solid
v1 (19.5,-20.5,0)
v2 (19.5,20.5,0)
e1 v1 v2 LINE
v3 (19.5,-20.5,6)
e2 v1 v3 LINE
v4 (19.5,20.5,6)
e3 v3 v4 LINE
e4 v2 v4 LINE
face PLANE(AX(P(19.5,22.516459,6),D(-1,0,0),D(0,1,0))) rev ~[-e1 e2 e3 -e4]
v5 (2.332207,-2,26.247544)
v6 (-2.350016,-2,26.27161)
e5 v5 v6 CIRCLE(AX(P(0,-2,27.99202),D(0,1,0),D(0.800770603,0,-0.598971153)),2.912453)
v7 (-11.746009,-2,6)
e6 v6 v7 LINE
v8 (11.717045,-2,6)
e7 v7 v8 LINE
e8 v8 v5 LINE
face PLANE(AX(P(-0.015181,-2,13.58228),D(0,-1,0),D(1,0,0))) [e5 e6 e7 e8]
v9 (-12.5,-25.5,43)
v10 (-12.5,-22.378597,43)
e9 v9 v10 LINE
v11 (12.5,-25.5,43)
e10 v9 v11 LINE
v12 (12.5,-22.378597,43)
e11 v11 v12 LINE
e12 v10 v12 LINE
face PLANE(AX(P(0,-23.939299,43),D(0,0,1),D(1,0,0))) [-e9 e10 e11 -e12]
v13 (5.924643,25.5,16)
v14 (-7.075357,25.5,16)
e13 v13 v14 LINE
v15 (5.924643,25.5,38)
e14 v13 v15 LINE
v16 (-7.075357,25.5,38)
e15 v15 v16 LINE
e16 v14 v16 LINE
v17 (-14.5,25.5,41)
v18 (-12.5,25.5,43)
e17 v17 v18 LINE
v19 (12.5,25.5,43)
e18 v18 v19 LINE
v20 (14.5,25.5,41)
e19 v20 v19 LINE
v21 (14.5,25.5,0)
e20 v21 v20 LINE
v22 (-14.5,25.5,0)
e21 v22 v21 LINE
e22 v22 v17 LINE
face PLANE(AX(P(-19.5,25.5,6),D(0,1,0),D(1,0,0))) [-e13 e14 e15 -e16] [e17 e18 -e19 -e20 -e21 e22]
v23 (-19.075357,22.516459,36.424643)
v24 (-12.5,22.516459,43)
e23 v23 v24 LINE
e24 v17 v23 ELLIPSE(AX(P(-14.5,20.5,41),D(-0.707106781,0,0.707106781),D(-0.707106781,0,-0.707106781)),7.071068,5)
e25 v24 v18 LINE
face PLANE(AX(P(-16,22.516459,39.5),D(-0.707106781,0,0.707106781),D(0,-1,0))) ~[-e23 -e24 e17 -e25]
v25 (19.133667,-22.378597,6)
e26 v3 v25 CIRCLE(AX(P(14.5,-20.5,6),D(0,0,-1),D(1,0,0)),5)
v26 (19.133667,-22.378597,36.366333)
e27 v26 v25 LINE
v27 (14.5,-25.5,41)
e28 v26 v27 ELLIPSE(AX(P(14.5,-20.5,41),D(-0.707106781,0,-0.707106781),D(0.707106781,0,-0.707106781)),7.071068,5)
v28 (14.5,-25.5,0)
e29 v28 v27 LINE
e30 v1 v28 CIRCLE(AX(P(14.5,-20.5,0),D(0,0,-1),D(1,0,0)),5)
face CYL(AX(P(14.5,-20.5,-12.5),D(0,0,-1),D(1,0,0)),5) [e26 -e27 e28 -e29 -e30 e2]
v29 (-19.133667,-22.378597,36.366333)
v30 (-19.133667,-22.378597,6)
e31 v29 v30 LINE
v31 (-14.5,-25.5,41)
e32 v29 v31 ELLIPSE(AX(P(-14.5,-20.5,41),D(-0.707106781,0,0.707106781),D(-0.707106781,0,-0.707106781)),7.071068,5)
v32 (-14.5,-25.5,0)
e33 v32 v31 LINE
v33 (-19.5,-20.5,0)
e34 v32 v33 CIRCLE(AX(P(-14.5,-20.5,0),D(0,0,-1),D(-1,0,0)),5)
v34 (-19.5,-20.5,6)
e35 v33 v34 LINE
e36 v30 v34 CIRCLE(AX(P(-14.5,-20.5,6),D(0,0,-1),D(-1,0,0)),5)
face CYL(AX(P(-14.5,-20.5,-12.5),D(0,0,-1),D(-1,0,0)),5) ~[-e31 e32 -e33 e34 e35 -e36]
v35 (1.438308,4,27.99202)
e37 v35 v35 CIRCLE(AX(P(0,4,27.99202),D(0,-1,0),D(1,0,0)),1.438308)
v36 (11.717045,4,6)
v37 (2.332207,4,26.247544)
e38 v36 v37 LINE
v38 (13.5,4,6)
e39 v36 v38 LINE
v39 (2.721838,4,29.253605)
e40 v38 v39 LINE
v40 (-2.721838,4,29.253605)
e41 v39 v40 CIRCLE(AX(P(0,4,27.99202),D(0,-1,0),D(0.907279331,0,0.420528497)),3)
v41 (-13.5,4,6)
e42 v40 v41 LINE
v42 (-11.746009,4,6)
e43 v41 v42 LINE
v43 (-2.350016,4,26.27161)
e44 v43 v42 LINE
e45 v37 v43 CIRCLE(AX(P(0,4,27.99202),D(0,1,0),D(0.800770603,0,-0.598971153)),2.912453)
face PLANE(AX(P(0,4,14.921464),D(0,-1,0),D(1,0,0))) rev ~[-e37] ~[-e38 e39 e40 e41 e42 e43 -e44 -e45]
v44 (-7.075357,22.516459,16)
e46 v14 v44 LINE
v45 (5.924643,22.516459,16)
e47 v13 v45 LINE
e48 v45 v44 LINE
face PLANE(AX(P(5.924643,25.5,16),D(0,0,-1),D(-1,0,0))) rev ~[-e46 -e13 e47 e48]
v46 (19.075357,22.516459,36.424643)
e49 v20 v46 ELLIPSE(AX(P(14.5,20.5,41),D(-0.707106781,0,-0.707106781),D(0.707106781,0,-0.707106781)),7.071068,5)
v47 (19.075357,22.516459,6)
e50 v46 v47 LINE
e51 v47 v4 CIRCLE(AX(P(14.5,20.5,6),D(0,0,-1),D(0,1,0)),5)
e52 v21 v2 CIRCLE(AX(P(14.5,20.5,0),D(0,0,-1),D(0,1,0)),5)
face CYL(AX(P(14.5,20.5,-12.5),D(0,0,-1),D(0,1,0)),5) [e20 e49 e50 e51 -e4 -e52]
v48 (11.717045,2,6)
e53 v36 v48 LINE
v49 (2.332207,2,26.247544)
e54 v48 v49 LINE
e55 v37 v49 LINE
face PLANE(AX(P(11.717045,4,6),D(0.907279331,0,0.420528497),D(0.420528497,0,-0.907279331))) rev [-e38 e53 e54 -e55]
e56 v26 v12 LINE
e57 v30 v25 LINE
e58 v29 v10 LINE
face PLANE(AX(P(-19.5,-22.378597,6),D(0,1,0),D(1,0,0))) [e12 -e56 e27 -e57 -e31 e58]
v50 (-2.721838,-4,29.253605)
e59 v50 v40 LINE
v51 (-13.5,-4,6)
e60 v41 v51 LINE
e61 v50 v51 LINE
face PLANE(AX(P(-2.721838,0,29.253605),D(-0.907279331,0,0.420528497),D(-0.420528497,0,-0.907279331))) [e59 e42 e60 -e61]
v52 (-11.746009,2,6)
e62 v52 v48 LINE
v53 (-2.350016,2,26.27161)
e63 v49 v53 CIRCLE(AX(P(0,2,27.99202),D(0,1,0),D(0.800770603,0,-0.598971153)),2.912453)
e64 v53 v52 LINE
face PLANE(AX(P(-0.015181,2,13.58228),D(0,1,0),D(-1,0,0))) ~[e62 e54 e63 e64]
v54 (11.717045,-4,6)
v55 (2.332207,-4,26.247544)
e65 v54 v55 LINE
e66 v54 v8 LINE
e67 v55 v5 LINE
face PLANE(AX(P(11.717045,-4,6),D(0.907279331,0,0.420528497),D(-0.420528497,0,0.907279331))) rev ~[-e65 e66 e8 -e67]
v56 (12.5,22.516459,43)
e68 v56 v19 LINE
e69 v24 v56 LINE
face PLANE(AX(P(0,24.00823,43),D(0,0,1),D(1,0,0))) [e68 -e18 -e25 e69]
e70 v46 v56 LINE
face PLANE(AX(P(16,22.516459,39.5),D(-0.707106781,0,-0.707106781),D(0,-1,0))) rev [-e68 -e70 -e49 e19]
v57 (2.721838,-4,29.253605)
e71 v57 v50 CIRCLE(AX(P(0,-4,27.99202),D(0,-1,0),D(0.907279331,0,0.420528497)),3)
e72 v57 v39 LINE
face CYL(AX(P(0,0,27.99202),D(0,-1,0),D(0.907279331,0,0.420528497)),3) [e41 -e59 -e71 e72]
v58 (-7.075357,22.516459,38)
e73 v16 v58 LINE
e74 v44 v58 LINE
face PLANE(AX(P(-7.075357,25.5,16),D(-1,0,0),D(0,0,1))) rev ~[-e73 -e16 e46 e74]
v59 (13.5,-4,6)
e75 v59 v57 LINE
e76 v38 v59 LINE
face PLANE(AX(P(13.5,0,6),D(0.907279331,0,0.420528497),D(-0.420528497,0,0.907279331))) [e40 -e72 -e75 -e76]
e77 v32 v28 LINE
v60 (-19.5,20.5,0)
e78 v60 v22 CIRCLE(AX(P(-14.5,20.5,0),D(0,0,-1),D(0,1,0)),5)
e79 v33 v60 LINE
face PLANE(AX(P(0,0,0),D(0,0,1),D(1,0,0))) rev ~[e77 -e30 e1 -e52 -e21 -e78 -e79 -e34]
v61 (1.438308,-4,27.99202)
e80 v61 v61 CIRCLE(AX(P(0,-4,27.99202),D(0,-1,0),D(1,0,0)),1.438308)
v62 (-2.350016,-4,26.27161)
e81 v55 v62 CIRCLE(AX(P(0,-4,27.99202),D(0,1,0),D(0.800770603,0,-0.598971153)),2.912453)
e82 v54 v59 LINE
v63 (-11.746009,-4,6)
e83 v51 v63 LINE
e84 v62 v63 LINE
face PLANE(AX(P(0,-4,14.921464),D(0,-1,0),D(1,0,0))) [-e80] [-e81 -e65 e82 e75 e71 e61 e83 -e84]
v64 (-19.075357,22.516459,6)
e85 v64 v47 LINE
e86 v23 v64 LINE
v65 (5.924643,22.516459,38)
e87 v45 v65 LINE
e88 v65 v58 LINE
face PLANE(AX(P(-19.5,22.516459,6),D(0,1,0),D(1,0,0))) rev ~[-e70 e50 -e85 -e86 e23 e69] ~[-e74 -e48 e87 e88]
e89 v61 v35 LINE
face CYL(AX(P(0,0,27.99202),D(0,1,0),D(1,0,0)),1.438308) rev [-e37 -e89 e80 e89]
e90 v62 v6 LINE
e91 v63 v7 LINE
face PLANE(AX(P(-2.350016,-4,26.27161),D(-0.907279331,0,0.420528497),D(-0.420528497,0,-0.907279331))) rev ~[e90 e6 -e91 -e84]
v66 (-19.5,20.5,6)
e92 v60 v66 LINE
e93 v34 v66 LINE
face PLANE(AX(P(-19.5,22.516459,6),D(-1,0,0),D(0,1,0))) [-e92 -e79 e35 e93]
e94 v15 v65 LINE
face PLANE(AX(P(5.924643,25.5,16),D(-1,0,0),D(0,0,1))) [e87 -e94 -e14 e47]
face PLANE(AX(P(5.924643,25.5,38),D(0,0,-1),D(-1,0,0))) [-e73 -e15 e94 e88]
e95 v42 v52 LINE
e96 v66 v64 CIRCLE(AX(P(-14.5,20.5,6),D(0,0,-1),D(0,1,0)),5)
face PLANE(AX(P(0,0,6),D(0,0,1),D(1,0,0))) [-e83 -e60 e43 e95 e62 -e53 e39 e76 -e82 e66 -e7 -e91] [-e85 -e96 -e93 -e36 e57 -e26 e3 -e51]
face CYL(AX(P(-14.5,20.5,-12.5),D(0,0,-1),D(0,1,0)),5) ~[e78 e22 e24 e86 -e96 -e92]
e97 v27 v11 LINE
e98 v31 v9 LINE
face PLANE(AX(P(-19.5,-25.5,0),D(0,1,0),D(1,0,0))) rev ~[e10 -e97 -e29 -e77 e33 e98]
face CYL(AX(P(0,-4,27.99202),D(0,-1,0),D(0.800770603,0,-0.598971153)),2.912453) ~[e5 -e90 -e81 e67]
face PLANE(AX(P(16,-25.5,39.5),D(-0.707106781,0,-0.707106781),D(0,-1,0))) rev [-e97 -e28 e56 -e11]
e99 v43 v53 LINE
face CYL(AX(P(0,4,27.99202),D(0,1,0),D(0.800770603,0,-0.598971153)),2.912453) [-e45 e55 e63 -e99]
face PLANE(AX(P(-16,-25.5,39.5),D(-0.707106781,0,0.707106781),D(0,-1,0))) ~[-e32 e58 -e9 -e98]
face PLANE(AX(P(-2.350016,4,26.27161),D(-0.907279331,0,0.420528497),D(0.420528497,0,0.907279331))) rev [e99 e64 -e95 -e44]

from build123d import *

# Parameters (mm, degrees)
F0_W          = 39
F0_H          = 51
F1_DEPTH      = 6
F2_R          = 1.4383077573
F3_DEPTH      = 4
F3_DEPTH_BACK = 4
F5_DEPTH      = 2
F6_W          = 39
F6_H          = 2.9835407734
F6_H_2        = 3.1214025915
F7_DEPTH      = 37
F8_SIZE       = 7
F9_T1_DEPTH   = 61
F10_W         = 13
F10_H         = 22
F11_DEPTH     = 15.8


# Not quite as in the source:
# - a fillet or chamfer that OpenCascade refuses, or shapes differently, is made with other operations: its cross-section is extruded or revolved along the edge and cut away or added
# - a pattern or mirror of a feature is missing from the dataset's text; its kind, count and spacing are read off the source's solid


with BuildPart() as f1:
    # F0 (on Top) → F1 (new body)
    with BuildSketch(Plane.XY):
        Rectangle(F0_W, F0_H)
    extrude(amount=F1_DEPTH)

    # F2 (on Front) → F3 (join, two sides)
    with BuildSketch(Plane.XZ) as f3_sk:
        with BuildLine():
            Line((-2.7218379916, 29.2536051472), (-13.5, 6))
            Line((-13.5, 6), (13.5, 6))
            Line((13.5, 6), (2.7218379916, 29.2536051472))
            ThreePointArc((2.7218379916, 29.2536051472), (0, 30.9920196576), (-2.7218379916, 29.2536051472))
        make_face()
        with Locations((0, 27.9920196576)):
            Circle(F2_R, mode=Mode.SUBTRACT)
    extrude(amount=F3_DEPTH)
    extrude(f3_sk.sketch, amount=-F3_DEPTH_BACK)

    # F4 (on face) → F5 (cut)
    with BuildSketch(Plane.XZ.offset(4)):
        with BuildLine():
            Line((-2.3500163027, 26.2716104284), (-11.7460088804, 6))
            Line((-11.7460088804, 6), (11.7170447484, 6))
            Line((11.7170447484, 6), (2.3322070272, 26.2475441144))
            ThreePointArc((2.3322070272, 26.2475441144), (-0.0149696172, 25.0796047749), (-2.3500163027, 26.2716104284))
        make_face()
    f5 = extrude(amount=-F5_DEPTH, mode=Mode.SUBTRACT)

    # F5_copies: F5 across plane
    add(f5.mirror(Plane.ZX), mode=Mode.SUBTRACT)

    # F6 (on face) → F7 (join)
    with BuildSketch(Plane.XY.offset(6)):
        with Locations((0, 24.0082296133)):
            Rectangle(F6_W, F6_H)
        with Locations((0, -23.9392987043)):
            Rectangle(F6_W, F6_H_2)
    extrude(amount=F7_DEPTH)

    # F8
    f8_edges = [f1.edges().sort_by_distance(p)[0] for p in [
        (19.5, 24.00823, 43),
        (-19.5, 24.00823, 43),
        (-19.5, -23.939299, 43),
        (19.5, -23.939299, 43),
    ]]
    chamfer(f8_edges, length=F8_SIZE)

    # F9: fillet of radius 5 on 4 edges, made by hand

    # F9_s2 → F9_t1 (cut)
    with BuildSketch(Plane.XY.offset(-12.5)):
        with BuildLine():
            ThreePointArc((19.5, -20.5), (18.0355339059, -24.0355339059), (14.5, -25.5))
            Line((14.5, -25.5), (19.5, -25.5))
            Line((19.5, -25.5), (19.5, -20.5))
        make_face()
        with BuildLine():
            ThreePointArc((-19.5, -20.5), (-18.0355339059, -24.0355339059), (-14.5, -25.5))
            Line((-14.5, -25.5), (-19.5, -25.5))
            Line((-19.5, -25.5), (-19.5, -20.5))
        make_face()
        with BuildLine():
            ThreePointArc((14.5, 25.5), (18.0355339059, 24.0355339059), (19.5, 20.5))
            Line((19.5, 20.5), (19.5, 25.5))
            Line((19.5, 25.5), (14.5, 25.5))
        make_face()
        with BuildLine():
            ThreePointArc((-14.5, 25.5), (-18.0355339059, 24.0355339059), (-19.5, 20.5))
            Line((-19.5, 20.5), (-19.5, 25.5))
            Line((-19.5, 25.5), (-14.5, 25.5))
        make_face()
    extrude(amount=F9_T1_DEPTH, mode=Mode.SUBTRACT)

    # F10 (on face) → F11 (cut)
    with BuildSketch(Plane(origin=(0, 25.5, 0), x_dir=(-1, 0, 0), z_dir=(0, 1, 0))):
        with Locations((0.5753570557, 27)):
            Rectangle(F10_W, F10_H)
    extrude(amount=-F11_DEPTH, mode=Mode.SUBTRACT)


solid = f1.part
